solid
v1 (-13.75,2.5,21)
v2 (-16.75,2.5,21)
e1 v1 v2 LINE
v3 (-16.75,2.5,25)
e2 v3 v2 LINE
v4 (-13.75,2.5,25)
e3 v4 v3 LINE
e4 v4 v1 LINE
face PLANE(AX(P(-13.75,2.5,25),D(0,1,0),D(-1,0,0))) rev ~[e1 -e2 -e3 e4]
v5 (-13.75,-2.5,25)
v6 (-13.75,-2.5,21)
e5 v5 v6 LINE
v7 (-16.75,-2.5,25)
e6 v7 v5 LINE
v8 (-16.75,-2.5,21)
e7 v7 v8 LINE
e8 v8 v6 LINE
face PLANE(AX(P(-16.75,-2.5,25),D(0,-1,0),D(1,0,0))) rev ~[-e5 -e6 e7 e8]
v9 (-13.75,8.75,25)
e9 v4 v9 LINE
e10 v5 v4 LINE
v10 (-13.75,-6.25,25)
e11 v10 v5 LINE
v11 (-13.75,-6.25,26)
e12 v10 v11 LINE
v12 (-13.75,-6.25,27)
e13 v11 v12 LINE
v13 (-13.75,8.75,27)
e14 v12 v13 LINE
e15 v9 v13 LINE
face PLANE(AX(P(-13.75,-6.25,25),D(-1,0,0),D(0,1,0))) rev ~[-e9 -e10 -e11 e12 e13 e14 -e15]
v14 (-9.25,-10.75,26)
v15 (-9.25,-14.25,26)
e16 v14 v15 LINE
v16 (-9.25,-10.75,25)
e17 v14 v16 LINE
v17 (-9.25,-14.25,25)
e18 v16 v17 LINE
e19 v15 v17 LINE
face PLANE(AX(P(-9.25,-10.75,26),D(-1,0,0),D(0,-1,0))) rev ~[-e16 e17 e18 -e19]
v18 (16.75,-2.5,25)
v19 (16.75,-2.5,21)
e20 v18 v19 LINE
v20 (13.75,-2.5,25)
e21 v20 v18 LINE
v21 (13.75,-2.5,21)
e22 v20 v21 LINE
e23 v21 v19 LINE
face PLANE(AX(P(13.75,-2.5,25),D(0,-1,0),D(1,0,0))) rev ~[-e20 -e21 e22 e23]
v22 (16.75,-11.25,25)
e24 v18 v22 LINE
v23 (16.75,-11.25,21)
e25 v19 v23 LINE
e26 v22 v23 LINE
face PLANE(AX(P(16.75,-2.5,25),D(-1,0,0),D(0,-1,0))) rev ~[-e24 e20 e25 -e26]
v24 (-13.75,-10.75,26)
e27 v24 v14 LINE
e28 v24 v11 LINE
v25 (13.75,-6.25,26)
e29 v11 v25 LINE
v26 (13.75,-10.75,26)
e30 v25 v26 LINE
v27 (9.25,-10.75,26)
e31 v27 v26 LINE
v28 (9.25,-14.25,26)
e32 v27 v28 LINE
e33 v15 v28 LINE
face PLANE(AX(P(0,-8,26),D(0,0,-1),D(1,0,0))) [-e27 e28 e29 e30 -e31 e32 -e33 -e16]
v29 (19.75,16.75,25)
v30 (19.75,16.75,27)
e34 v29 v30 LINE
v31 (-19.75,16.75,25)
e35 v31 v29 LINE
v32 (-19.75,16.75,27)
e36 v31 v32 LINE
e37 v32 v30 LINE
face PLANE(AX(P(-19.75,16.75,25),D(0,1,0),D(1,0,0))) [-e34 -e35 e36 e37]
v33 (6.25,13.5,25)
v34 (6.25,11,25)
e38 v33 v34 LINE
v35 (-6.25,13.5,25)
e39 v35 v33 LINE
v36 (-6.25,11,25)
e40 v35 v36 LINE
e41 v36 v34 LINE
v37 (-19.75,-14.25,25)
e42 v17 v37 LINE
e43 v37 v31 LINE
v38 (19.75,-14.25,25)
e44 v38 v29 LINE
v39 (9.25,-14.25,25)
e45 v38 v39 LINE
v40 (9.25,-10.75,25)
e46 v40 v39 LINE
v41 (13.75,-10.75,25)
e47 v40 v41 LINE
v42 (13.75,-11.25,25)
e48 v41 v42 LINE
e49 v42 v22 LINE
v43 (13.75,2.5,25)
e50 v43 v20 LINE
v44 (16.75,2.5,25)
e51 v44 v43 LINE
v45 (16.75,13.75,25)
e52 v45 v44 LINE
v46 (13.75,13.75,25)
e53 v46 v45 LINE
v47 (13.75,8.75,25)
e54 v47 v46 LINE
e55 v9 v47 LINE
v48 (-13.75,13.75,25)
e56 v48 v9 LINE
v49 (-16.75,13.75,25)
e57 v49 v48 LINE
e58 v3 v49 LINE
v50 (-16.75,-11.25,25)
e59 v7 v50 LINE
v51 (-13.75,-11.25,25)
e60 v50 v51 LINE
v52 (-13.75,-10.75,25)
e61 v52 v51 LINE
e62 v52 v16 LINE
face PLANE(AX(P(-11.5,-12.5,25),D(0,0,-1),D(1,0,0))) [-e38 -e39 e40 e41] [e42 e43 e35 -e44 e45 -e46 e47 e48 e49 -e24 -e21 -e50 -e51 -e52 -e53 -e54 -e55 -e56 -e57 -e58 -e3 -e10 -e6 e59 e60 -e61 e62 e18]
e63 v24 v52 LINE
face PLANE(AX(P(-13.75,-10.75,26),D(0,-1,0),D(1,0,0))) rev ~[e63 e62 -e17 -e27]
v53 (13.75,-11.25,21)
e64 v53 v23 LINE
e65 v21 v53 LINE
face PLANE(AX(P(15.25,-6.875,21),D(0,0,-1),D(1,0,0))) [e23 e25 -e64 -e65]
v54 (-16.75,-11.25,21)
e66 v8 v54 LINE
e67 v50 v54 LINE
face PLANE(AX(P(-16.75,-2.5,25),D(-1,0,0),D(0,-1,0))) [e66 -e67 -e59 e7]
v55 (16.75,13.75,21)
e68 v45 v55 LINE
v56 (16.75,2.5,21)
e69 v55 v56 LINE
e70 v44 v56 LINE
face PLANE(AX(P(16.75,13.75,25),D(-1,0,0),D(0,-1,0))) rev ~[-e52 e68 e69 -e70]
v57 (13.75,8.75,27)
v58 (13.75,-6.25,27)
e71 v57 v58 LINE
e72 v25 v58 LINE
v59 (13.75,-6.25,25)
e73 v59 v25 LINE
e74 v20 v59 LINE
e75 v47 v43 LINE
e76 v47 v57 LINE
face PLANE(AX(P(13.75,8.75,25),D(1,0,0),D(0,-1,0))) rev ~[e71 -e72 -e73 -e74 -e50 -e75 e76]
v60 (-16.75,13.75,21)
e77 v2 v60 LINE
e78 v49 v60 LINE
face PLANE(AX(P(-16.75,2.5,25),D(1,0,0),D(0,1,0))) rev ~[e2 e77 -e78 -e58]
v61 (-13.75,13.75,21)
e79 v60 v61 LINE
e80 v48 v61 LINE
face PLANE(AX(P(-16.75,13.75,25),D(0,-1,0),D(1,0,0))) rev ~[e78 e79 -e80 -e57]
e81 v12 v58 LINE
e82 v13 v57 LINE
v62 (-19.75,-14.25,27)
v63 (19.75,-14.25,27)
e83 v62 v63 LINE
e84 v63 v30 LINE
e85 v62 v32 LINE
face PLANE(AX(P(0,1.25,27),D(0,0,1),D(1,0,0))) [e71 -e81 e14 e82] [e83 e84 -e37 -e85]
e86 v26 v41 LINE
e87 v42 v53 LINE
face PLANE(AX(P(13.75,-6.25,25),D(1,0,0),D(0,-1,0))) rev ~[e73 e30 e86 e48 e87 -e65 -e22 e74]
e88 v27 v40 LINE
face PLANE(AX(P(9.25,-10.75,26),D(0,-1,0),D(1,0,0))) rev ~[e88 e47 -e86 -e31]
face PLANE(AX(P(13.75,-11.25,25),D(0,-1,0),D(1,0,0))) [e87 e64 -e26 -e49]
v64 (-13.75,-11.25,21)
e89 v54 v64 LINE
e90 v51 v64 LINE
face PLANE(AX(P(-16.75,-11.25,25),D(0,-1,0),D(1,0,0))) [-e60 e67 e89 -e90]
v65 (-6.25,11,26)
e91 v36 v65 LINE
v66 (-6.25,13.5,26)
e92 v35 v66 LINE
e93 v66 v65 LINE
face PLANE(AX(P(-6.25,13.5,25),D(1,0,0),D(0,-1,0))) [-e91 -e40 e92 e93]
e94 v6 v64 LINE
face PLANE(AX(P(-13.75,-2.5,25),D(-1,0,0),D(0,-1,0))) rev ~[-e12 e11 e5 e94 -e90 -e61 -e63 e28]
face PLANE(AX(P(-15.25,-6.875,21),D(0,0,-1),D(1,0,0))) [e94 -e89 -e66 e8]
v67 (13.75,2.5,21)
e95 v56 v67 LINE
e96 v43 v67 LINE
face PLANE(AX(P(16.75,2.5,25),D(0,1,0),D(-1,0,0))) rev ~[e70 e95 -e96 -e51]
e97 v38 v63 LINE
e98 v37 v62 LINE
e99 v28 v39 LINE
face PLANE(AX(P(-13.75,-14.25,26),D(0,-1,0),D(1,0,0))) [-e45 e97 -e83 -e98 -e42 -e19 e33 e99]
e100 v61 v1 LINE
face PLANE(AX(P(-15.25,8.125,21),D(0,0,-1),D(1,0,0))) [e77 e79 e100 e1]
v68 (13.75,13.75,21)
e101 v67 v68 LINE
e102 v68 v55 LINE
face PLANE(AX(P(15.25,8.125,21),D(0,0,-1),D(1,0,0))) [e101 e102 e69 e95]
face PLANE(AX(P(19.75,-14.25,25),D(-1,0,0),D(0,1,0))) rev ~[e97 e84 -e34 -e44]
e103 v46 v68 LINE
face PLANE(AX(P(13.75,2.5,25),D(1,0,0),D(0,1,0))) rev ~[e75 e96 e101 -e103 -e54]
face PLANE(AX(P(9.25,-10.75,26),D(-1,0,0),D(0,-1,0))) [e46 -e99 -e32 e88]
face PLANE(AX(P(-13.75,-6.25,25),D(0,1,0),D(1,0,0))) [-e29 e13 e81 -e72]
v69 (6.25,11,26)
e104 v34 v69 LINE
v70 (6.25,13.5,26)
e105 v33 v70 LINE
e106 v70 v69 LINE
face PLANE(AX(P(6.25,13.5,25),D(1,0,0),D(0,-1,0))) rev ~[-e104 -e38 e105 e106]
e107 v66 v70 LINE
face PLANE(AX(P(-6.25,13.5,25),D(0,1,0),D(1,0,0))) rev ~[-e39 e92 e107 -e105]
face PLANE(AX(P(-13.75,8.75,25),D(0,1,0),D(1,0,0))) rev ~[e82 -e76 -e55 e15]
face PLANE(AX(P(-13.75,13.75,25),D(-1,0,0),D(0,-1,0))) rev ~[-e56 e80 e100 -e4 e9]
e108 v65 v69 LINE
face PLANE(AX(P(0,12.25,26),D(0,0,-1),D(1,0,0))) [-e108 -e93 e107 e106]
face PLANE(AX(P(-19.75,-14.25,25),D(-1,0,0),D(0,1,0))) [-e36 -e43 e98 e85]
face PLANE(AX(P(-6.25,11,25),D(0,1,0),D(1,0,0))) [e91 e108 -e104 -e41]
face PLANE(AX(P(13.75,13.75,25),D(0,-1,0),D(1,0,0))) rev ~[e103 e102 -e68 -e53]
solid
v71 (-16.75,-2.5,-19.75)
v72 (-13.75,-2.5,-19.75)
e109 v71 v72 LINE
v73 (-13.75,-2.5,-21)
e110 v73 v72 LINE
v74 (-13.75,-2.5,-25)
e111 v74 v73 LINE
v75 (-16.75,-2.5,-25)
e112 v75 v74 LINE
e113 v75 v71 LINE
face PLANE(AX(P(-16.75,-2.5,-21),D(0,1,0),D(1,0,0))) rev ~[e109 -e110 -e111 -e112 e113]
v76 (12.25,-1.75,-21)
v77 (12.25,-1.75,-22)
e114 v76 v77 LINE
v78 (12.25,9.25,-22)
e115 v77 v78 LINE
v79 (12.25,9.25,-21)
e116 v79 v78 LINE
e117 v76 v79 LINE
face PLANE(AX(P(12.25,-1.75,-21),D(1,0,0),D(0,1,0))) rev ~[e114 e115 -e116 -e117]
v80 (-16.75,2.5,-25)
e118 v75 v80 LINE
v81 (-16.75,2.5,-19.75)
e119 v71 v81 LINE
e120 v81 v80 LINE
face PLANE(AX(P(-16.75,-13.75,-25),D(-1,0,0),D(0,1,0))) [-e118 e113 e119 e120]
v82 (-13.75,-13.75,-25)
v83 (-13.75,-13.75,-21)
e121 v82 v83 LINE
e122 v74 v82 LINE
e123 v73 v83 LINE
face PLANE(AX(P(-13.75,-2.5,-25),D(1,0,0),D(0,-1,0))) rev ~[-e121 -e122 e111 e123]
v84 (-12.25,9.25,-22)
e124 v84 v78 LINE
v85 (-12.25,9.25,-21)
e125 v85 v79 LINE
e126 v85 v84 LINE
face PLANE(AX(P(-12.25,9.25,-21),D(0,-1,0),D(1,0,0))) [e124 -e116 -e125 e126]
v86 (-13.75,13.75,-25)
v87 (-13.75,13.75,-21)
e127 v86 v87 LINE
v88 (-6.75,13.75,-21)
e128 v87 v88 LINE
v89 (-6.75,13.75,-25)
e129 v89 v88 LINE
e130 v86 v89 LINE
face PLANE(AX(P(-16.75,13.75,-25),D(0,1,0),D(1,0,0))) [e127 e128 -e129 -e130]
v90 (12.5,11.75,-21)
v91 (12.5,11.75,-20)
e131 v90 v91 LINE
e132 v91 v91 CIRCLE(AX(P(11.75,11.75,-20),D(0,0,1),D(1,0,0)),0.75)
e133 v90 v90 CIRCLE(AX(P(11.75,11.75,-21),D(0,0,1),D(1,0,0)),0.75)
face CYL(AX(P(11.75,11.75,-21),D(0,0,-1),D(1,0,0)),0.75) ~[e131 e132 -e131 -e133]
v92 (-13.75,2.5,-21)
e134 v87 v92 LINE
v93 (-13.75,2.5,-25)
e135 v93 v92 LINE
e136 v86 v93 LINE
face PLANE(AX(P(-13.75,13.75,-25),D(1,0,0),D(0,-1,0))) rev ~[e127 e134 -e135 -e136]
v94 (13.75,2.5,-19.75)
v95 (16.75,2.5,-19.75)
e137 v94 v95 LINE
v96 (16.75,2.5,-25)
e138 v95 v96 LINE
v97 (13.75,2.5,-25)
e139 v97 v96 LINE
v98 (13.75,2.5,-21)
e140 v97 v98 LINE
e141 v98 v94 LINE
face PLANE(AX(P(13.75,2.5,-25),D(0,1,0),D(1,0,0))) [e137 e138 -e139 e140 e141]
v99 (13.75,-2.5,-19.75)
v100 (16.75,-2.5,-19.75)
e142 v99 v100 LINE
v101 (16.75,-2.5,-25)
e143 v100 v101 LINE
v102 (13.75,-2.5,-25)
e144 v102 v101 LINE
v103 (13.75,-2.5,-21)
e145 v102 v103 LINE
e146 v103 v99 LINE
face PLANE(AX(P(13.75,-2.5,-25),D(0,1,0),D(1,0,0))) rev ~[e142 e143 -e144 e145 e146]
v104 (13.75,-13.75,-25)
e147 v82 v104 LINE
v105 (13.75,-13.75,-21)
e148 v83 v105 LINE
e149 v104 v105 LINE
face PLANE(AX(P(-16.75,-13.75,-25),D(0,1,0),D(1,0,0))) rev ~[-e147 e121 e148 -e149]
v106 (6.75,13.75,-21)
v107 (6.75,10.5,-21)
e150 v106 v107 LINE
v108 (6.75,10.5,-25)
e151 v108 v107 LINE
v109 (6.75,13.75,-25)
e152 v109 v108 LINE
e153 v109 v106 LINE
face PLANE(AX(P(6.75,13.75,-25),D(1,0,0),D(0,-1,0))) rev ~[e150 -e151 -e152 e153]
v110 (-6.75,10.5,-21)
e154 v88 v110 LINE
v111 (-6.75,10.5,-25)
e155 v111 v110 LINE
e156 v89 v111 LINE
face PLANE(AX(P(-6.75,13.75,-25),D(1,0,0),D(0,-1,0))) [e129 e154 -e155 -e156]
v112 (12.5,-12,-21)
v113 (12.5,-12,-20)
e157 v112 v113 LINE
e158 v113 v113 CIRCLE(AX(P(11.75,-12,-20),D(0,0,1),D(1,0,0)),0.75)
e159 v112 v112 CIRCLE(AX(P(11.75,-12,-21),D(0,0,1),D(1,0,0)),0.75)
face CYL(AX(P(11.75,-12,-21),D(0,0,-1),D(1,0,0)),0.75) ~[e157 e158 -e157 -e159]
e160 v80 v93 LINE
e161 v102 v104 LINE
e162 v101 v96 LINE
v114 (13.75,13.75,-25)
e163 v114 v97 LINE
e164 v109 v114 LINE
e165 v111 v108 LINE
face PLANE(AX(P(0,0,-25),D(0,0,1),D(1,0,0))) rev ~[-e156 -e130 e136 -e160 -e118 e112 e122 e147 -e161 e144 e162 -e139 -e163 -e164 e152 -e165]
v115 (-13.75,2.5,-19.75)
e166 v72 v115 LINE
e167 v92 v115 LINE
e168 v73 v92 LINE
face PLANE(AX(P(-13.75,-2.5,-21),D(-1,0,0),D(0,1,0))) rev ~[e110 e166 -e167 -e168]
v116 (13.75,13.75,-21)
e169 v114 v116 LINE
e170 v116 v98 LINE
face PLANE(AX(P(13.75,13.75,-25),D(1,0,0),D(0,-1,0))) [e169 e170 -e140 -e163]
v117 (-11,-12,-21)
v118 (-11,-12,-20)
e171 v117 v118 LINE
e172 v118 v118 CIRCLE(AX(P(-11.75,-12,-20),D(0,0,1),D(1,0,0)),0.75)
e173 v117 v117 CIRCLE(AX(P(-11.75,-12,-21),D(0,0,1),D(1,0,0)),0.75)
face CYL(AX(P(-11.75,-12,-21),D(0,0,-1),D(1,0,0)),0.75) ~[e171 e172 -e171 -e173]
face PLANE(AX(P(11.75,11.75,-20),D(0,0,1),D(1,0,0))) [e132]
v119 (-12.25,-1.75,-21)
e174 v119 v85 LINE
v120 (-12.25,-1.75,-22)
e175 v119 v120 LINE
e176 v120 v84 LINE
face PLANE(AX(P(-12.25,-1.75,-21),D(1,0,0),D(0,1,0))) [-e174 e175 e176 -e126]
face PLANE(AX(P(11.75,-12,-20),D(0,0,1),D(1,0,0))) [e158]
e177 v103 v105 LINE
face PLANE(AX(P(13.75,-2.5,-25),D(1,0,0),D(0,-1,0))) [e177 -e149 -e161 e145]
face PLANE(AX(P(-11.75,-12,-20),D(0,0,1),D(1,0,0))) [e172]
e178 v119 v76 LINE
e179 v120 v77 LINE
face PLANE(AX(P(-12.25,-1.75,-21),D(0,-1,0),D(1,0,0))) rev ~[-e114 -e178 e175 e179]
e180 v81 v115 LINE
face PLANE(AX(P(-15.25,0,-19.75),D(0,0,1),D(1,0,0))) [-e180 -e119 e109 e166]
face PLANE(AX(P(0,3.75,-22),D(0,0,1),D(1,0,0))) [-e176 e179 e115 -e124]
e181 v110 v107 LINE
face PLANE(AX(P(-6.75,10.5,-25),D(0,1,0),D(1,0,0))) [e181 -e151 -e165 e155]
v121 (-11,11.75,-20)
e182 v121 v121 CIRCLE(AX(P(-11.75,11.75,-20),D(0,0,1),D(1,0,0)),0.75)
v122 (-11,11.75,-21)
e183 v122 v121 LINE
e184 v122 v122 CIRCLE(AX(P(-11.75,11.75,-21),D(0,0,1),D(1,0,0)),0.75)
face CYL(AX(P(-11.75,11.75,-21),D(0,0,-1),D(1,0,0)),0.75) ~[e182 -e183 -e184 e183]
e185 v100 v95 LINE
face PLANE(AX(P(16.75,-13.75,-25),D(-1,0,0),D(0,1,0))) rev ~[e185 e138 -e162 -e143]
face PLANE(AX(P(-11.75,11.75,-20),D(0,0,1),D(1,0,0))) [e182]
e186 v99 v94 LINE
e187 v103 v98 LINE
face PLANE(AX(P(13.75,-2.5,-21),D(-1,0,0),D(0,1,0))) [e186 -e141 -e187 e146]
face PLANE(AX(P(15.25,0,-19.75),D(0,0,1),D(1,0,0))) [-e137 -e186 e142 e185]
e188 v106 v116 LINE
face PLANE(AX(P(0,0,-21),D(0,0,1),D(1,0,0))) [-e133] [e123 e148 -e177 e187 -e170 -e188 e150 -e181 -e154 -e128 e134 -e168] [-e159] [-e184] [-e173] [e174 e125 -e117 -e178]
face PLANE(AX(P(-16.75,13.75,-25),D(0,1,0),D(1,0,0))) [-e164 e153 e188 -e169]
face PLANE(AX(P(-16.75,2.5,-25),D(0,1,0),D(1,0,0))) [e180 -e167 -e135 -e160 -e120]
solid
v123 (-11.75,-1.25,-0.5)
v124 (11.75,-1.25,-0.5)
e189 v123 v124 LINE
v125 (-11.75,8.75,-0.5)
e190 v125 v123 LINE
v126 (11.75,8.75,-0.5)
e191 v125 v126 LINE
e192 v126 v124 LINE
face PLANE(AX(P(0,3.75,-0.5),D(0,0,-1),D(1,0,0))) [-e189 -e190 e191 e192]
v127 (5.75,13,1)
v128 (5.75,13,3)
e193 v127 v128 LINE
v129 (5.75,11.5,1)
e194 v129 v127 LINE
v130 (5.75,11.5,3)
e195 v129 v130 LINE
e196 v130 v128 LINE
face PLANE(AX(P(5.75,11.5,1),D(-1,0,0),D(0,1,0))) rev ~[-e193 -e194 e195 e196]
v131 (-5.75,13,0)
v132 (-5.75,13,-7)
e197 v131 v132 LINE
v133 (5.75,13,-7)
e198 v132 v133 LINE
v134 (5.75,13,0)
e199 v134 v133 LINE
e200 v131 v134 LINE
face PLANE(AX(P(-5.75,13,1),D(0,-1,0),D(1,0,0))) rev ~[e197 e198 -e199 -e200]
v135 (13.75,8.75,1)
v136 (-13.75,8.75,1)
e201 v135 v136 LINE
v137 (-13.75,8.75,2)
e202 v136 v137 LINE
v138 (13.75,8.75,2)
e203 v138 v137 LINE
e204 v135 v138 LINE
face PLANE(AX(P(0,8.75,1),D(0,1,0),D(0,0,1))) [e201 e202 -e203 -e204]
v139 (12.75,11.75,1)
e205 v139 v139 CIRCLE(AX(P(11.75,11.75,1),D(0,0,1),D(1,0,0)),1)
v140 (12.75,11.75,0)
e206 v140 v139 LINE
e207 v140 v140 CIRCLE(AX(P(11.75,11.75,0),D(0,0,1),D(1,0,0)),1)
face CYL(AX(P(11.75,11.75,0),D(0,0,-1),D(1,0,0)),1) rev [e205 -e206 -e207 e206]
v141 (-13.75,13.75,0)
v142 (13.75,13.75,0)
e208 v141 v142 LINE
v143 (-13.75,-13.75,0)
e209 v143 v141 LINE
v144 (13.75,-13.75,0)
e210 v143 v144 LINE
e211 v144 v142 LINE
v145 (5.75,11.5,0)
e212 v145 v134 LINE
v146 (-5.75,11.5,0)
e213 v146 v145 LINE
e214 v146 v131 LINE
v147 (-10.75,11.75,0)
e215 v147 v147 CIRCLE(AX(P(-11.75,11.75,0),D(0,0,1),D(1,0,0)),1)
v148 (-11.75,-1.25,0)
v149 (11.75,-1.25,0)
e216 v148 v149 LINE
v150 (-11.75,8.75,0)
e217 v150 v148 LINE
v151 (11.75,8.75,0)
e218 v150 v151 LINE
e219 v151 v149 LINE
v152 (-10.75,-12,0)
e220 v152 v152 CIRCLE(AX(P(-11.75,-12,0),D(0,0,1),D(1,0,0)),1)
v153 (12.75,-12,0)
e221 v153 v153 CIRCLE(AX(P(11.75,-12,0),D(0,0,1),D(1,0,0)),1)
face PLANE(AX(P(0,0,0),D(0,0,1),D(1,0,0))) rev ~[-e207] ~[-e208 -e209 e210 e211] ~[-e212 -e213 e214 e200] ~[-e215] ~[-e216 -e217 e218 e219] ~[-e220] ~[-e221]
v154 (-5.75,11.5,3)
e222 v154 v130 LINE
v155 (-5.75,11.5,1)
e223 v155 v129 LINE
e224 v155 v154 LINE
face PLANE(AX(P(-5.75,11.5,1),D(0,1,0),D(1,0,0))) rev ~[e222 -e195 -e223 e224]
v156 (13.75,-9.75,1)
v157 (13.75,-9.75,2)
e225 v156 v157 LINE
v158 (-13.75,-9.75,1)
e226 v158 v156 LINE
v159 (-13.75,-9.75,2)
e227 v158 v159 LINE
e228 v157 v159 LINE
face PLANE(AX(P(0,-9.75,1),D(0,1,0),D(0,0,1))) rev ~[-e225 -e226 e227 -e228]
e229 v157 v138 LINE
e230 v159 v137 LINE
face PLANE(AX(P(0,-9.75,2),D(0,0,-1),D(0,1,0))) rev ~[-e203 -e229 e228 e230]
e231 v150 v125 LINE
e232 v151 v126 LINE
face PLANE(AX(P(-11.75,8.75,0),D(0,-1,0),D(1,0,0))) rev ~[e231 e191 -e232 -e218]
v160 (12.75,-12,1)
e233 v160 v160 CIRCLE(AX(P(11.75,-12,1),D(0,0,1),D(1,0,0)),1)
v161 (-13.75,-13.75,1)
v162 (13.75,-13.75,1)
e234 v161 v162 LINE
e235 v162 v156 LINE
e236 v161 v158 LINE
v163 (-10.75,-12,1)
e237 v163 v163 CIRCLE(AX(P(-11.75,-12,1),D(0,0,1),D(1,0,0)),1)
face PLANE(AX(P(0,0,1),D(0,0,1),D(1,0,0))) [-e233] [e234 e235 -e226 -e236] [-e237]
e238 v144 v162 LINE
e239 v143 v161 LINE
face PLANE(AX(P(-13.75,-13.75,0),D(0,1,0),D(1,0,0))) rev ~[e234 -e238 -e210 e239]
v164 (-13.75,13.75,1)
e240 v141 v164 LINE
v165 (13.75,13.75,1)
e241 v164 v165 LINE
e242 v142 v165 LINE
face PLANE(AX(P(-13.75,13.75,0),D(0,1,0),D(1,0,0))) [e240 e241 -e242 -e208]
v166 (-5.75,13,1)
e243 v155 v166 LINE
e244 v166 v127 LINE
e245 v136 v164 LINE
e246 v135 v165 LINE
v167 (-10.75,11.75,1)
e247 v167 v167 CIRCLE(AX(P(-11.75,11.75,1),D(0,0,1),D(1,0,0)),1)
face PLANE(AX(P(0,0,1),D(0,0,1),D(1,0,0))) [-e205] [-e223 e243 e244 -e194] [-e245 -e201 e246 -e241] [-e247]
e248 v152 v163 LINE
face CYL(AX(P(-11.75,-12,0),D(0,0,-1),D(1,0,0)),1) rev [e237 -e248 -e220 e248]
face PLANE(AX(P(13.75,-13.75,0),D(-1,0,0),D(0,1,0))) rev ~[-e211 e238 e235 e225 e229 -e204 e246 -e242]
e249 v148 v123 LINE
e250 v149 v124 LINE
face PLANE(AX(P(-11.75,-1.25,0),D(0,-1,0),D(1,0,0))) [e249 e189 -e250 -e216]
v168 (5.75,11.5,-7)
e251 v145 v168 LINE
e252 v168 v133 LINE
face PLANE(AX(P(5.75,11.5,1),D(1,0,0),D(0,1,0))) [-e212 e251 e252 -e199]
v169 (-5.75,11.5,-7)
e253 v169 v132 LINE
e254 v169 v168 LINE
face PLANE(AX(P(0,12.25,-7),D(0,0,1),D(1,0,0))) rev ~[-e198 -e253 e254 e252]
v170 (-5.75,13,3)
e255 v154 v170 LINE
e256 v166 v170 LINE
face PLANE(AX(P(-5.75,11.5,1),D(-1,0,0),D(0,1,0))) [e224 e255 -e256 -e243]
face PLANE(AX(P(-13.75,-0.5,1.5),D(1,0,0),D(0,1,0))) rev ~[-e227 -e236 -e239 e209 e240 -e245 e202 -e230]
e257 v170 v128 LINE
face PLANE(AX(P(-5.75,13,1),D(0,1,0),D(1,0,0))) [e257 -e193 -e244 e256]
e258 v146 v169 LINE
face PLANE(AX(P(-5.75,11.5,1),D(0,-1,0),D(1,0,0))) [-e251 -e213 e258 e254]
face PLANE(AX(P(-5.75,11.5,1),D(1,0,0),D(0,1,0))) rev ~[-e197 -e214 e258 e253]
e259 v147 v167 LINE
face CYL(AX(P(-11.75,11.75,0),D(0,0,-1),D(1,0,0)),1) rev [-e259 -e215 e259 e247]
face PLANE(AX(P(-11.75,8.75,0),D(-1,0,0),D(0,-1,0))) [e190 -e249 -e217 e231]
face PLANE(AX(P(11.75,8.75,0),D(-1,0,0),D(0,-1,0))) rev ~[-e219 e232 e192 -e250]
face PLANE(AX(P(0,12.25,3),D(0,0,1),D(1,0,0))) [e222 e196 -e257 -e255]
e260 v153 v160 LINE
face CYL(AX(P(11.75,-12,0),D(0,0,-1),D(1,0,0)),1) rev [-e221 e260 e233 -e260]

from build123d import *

# Parameters (mm, degrees)
F0_W          = 27.5
F0_H          = 27.5
F0_R          = 1
F1_DEPTH      = 1
F2_W          = 18.5
F2_H          = 1
F3_DEPTH      = 13.75
F3_DEPTH_BACK = 13.75
F4_W          = 11.5
F4_H          = 1.5
F5_DEPTH      = 2
F5_DEPTH_BACK = 8
F6_W          = 23.5
F6_H          = 10
F7_DEPTH      = 0.5
F9_W          = 39.5
F9_H          = 31
F9_W_2        = 27.5000000002
F9_H_2        = 3.5
F10_DEPTH     = 2
F11_W         = 27.5
F11_H         = 3.5
F11_H_2       = 4.5
F11_W_2       = 12.5
F11_H_3       = 2.5
F11_W_3       = 11.5
F11_H_4       = 1.5
F12_DEPTH     = 1
F13_W         = 3
F13_H         = 8.75
F14_DEPTH     = 4
F15_W         = 4.5
F15_H         = 3.5
F16_DEPTH     = 1
F18_W         = 33.5
F18_H         = 27.5
F19_DEPTH     = 4
F20_R         = 0.75
F21_DEPTH     = 1
F22_W         = 3
F22_H         = 5
F23_DEPTH     = 1.25
F24_W         = 3
F24_H         = 11.25
F24_W_2       = 13.5
F24_H_2       = 3.25
F25_DEPTH     = 4
F26_W         = 24.5
F26_H         = 11
F27_DEPTH     = 1


with BuildPart() as f1:
    # F0 (on Top) → F1 (new body)
    with BuildSketch(Plane.XY):
        Rectangle(F0_W, F0_H)
        with Locations((-11.75, -12)):
            Circle(F0_R, mode=Mode.SUBTRACT)
        with Locations((11.75, -12)):
            Circle(F0_R, mode=Mode.SUBTRACT)
        with Locations((-11.75, 11.75)):
            Circle(F0_R, mode=Mode.SUBTRACT)
        with Locations((11.75, 11.75)):
            Circle(F0_R, mode=Mode.SUBTRACT)
    extrude(amount=F1_DEPTH)

    # F2 (on Right) → F3 (join, two sides)
    with BuildSketch(Plane.YZ) as f3_sk:
        with Locations((-0.5, 1.5)):
            Rectangle(F2_W, F2_H)
    extrude(amount=F3_DEPTH)
    extrude(f3_sk.sketch, amount=-F3_DEPTH_BACK)

    # F4 (on face) → F5 (join, two sides)
    with BuildSketch(Plane.XY.offset(1)) as f5_sk:
        with Locations((0, 12.25)):
            Rectangle(F4_W, F4_H)
    extrude(amount=F5_DEPTH)
    extrude(f5_sk.sketch, amount=-F5_DEPTH_BACK)

    # F6 (on face) → F7 (join)
    with BuildSketch(Plane(origin=(0, 0, 0), x_dir=(1, 0, 0), z_dir=(0, 0, -1))):
        with Locations((0, -3.75)):
            Rectangle(F6_W, F6_H)
    extrude(amount=F7_DEPTH)


with BuildPart() as f10:
    # F9 (on offset) → F10 (new body)
    with BuildSketch(Plane.XY.offset(25)):
        with Locations((0, 1.25)):
            Rectangle(F9_W, F9_H)
        Polygon((-13.7499999998, 8.75), (13.7500000002, 8.75), (13.75, -6.25), (13.75, -9.75), (-13.7499999998, -9.75), (-13.75, -6.25), align=None, mode=Mode.SUBTRACT)
        with Locations((1e-10, -8)):
            Rectangle(F9_W_2, F9_H_2)
    extrude(amount=F10_DEPTH)

    # F11 (on face) → F12 (cut)
    with BuildSketch(Plane(origin=(0, 0, 25), x_dir=(1, 0, 0), z_dir=(0, 0, -1))):
        with Locations((0, 8)):
            Rectangle(F11_W, F11_H)
        with Locations((0, 12)):
            Rectangle(F11_W, F11_H_2)
        with Locations((0, -12.25)):
            Rectangle(F11_W_2, F11_H_3)
        with Locations((0, -12.25)):
            Rectangle(F11_W_3, F11_H_4, mode=Mode.SUBTRACT)
        with Locations((0, -12.25)):
            Rectangle(F11_W_3, F11_H_4)
    extrude(amount=-F12_DEPTH, mode=Mode.SUBTRACT)

    # F13 (on face) → F14 (join)
    with BuildSketch(Plane(origin=(0, 0, 25), x_dir=(1, 0, 0), z_dir=(0, 0, -1))):
        with Locations((-15.25, 6.875)):
            Rectangle(F13_W, F13_H)
        Polygon((16.75, -2.5), (13.75, -2.5), (13.75, -8.75), (13.75, -13.75), (16.75, -13.75), align=None)
        Polygon((-13.75, -8.75), (-13.75, -2.5), (-16.75, -2.5), (-16.75, -13.75), (-13.75, -13.75), align=None)
        with Locations((15.25, 6.875)):
            Rectangle(F13_W, F13_H)
    extrude(amount=F14_DEPTH)

    # F15 (on face) → F16 (join, through all)
    with BuildSketch(Plane(origin=(0, 0, 26), x_dir=(1, 0, 0), z_dir=(0, 0, -1))):
        with Locations((-11.5, 12.5)):
            Rectangle(F15_W, F15_H)
        with Locations((11.5, 12.5)):
            Rectangle(F15_W, F15_H)
    extrude(amount=F16_DEPTH)


with BuildPart() as f19:
    # F18 (on offset) → F19 (new body)
    with BuildSketch(Plane.XY.offset(-25)):
        Rectangle(F18_W, F18_H)
    extrude(amount=F19_DEPTH)

    # F20 (on face) → F21 (join)
    with BuildSketch(Plane.XY.offset(-21)):
        with Locations((-11.75, -12)):
            Circle(F20_R)
        with Locations((11.75, -12)):
            Circle(F20_R)
        with Locations((11.75, 11.75)):
            Circle(F20_R)
        with Locations((-11.75, 11.75)):
            Circle(F20_R)
    extrude(amount=F21_DEPTH)

    # F22 (on face) → F23 (join)
    with BuildSketch(Plane.XY.offset(-21)):
        with Locations((-15.25, 0)):
            Rectangle(F22_W, F22_H)
        with Locations((15.25, 0)):
            Rectangle(F22_W, F22_H)
    extrude(amount=F23_DEPTH)

    # F24 (on face) → F25 (cut, through all)
    with BuildSketch(Plane(origin=(0, 0, -25), x_dir=(1, 0, 0), z_dir=(0, 0, -1))):
        with Locations((-15.25, 8.125)):
            Rectangle(F24_W, F24_H)
        with Locations((15.25, -8.125)):
            Rectangle(F24_W, F24_H)
        with Locations((-15.25, -8.125)):
            Rectangle(F24_W, F24_H)
        with Locations((15.25, 8.125)):
            Rectangle(F24_W, F24_H)
        with Locations((0, -12.125)):
            Rectangle(F24_W_2, F24_H_2)
    extrude(amount=-F25_DEPTH, mode=Mode.SUBTRACT)

    # F26 (on face) → F27 (cut)
    with BuildSketch(Plane.XY.offset(-21)):
        with Locations((0, 3.75)):
            Rectangle(F26_W, F26_H)
    extrude(amount=-F27_DEPTH, mode=Mode.SUBTRACT)


solid = Compound([f1.part, f10.part, f19.part])
